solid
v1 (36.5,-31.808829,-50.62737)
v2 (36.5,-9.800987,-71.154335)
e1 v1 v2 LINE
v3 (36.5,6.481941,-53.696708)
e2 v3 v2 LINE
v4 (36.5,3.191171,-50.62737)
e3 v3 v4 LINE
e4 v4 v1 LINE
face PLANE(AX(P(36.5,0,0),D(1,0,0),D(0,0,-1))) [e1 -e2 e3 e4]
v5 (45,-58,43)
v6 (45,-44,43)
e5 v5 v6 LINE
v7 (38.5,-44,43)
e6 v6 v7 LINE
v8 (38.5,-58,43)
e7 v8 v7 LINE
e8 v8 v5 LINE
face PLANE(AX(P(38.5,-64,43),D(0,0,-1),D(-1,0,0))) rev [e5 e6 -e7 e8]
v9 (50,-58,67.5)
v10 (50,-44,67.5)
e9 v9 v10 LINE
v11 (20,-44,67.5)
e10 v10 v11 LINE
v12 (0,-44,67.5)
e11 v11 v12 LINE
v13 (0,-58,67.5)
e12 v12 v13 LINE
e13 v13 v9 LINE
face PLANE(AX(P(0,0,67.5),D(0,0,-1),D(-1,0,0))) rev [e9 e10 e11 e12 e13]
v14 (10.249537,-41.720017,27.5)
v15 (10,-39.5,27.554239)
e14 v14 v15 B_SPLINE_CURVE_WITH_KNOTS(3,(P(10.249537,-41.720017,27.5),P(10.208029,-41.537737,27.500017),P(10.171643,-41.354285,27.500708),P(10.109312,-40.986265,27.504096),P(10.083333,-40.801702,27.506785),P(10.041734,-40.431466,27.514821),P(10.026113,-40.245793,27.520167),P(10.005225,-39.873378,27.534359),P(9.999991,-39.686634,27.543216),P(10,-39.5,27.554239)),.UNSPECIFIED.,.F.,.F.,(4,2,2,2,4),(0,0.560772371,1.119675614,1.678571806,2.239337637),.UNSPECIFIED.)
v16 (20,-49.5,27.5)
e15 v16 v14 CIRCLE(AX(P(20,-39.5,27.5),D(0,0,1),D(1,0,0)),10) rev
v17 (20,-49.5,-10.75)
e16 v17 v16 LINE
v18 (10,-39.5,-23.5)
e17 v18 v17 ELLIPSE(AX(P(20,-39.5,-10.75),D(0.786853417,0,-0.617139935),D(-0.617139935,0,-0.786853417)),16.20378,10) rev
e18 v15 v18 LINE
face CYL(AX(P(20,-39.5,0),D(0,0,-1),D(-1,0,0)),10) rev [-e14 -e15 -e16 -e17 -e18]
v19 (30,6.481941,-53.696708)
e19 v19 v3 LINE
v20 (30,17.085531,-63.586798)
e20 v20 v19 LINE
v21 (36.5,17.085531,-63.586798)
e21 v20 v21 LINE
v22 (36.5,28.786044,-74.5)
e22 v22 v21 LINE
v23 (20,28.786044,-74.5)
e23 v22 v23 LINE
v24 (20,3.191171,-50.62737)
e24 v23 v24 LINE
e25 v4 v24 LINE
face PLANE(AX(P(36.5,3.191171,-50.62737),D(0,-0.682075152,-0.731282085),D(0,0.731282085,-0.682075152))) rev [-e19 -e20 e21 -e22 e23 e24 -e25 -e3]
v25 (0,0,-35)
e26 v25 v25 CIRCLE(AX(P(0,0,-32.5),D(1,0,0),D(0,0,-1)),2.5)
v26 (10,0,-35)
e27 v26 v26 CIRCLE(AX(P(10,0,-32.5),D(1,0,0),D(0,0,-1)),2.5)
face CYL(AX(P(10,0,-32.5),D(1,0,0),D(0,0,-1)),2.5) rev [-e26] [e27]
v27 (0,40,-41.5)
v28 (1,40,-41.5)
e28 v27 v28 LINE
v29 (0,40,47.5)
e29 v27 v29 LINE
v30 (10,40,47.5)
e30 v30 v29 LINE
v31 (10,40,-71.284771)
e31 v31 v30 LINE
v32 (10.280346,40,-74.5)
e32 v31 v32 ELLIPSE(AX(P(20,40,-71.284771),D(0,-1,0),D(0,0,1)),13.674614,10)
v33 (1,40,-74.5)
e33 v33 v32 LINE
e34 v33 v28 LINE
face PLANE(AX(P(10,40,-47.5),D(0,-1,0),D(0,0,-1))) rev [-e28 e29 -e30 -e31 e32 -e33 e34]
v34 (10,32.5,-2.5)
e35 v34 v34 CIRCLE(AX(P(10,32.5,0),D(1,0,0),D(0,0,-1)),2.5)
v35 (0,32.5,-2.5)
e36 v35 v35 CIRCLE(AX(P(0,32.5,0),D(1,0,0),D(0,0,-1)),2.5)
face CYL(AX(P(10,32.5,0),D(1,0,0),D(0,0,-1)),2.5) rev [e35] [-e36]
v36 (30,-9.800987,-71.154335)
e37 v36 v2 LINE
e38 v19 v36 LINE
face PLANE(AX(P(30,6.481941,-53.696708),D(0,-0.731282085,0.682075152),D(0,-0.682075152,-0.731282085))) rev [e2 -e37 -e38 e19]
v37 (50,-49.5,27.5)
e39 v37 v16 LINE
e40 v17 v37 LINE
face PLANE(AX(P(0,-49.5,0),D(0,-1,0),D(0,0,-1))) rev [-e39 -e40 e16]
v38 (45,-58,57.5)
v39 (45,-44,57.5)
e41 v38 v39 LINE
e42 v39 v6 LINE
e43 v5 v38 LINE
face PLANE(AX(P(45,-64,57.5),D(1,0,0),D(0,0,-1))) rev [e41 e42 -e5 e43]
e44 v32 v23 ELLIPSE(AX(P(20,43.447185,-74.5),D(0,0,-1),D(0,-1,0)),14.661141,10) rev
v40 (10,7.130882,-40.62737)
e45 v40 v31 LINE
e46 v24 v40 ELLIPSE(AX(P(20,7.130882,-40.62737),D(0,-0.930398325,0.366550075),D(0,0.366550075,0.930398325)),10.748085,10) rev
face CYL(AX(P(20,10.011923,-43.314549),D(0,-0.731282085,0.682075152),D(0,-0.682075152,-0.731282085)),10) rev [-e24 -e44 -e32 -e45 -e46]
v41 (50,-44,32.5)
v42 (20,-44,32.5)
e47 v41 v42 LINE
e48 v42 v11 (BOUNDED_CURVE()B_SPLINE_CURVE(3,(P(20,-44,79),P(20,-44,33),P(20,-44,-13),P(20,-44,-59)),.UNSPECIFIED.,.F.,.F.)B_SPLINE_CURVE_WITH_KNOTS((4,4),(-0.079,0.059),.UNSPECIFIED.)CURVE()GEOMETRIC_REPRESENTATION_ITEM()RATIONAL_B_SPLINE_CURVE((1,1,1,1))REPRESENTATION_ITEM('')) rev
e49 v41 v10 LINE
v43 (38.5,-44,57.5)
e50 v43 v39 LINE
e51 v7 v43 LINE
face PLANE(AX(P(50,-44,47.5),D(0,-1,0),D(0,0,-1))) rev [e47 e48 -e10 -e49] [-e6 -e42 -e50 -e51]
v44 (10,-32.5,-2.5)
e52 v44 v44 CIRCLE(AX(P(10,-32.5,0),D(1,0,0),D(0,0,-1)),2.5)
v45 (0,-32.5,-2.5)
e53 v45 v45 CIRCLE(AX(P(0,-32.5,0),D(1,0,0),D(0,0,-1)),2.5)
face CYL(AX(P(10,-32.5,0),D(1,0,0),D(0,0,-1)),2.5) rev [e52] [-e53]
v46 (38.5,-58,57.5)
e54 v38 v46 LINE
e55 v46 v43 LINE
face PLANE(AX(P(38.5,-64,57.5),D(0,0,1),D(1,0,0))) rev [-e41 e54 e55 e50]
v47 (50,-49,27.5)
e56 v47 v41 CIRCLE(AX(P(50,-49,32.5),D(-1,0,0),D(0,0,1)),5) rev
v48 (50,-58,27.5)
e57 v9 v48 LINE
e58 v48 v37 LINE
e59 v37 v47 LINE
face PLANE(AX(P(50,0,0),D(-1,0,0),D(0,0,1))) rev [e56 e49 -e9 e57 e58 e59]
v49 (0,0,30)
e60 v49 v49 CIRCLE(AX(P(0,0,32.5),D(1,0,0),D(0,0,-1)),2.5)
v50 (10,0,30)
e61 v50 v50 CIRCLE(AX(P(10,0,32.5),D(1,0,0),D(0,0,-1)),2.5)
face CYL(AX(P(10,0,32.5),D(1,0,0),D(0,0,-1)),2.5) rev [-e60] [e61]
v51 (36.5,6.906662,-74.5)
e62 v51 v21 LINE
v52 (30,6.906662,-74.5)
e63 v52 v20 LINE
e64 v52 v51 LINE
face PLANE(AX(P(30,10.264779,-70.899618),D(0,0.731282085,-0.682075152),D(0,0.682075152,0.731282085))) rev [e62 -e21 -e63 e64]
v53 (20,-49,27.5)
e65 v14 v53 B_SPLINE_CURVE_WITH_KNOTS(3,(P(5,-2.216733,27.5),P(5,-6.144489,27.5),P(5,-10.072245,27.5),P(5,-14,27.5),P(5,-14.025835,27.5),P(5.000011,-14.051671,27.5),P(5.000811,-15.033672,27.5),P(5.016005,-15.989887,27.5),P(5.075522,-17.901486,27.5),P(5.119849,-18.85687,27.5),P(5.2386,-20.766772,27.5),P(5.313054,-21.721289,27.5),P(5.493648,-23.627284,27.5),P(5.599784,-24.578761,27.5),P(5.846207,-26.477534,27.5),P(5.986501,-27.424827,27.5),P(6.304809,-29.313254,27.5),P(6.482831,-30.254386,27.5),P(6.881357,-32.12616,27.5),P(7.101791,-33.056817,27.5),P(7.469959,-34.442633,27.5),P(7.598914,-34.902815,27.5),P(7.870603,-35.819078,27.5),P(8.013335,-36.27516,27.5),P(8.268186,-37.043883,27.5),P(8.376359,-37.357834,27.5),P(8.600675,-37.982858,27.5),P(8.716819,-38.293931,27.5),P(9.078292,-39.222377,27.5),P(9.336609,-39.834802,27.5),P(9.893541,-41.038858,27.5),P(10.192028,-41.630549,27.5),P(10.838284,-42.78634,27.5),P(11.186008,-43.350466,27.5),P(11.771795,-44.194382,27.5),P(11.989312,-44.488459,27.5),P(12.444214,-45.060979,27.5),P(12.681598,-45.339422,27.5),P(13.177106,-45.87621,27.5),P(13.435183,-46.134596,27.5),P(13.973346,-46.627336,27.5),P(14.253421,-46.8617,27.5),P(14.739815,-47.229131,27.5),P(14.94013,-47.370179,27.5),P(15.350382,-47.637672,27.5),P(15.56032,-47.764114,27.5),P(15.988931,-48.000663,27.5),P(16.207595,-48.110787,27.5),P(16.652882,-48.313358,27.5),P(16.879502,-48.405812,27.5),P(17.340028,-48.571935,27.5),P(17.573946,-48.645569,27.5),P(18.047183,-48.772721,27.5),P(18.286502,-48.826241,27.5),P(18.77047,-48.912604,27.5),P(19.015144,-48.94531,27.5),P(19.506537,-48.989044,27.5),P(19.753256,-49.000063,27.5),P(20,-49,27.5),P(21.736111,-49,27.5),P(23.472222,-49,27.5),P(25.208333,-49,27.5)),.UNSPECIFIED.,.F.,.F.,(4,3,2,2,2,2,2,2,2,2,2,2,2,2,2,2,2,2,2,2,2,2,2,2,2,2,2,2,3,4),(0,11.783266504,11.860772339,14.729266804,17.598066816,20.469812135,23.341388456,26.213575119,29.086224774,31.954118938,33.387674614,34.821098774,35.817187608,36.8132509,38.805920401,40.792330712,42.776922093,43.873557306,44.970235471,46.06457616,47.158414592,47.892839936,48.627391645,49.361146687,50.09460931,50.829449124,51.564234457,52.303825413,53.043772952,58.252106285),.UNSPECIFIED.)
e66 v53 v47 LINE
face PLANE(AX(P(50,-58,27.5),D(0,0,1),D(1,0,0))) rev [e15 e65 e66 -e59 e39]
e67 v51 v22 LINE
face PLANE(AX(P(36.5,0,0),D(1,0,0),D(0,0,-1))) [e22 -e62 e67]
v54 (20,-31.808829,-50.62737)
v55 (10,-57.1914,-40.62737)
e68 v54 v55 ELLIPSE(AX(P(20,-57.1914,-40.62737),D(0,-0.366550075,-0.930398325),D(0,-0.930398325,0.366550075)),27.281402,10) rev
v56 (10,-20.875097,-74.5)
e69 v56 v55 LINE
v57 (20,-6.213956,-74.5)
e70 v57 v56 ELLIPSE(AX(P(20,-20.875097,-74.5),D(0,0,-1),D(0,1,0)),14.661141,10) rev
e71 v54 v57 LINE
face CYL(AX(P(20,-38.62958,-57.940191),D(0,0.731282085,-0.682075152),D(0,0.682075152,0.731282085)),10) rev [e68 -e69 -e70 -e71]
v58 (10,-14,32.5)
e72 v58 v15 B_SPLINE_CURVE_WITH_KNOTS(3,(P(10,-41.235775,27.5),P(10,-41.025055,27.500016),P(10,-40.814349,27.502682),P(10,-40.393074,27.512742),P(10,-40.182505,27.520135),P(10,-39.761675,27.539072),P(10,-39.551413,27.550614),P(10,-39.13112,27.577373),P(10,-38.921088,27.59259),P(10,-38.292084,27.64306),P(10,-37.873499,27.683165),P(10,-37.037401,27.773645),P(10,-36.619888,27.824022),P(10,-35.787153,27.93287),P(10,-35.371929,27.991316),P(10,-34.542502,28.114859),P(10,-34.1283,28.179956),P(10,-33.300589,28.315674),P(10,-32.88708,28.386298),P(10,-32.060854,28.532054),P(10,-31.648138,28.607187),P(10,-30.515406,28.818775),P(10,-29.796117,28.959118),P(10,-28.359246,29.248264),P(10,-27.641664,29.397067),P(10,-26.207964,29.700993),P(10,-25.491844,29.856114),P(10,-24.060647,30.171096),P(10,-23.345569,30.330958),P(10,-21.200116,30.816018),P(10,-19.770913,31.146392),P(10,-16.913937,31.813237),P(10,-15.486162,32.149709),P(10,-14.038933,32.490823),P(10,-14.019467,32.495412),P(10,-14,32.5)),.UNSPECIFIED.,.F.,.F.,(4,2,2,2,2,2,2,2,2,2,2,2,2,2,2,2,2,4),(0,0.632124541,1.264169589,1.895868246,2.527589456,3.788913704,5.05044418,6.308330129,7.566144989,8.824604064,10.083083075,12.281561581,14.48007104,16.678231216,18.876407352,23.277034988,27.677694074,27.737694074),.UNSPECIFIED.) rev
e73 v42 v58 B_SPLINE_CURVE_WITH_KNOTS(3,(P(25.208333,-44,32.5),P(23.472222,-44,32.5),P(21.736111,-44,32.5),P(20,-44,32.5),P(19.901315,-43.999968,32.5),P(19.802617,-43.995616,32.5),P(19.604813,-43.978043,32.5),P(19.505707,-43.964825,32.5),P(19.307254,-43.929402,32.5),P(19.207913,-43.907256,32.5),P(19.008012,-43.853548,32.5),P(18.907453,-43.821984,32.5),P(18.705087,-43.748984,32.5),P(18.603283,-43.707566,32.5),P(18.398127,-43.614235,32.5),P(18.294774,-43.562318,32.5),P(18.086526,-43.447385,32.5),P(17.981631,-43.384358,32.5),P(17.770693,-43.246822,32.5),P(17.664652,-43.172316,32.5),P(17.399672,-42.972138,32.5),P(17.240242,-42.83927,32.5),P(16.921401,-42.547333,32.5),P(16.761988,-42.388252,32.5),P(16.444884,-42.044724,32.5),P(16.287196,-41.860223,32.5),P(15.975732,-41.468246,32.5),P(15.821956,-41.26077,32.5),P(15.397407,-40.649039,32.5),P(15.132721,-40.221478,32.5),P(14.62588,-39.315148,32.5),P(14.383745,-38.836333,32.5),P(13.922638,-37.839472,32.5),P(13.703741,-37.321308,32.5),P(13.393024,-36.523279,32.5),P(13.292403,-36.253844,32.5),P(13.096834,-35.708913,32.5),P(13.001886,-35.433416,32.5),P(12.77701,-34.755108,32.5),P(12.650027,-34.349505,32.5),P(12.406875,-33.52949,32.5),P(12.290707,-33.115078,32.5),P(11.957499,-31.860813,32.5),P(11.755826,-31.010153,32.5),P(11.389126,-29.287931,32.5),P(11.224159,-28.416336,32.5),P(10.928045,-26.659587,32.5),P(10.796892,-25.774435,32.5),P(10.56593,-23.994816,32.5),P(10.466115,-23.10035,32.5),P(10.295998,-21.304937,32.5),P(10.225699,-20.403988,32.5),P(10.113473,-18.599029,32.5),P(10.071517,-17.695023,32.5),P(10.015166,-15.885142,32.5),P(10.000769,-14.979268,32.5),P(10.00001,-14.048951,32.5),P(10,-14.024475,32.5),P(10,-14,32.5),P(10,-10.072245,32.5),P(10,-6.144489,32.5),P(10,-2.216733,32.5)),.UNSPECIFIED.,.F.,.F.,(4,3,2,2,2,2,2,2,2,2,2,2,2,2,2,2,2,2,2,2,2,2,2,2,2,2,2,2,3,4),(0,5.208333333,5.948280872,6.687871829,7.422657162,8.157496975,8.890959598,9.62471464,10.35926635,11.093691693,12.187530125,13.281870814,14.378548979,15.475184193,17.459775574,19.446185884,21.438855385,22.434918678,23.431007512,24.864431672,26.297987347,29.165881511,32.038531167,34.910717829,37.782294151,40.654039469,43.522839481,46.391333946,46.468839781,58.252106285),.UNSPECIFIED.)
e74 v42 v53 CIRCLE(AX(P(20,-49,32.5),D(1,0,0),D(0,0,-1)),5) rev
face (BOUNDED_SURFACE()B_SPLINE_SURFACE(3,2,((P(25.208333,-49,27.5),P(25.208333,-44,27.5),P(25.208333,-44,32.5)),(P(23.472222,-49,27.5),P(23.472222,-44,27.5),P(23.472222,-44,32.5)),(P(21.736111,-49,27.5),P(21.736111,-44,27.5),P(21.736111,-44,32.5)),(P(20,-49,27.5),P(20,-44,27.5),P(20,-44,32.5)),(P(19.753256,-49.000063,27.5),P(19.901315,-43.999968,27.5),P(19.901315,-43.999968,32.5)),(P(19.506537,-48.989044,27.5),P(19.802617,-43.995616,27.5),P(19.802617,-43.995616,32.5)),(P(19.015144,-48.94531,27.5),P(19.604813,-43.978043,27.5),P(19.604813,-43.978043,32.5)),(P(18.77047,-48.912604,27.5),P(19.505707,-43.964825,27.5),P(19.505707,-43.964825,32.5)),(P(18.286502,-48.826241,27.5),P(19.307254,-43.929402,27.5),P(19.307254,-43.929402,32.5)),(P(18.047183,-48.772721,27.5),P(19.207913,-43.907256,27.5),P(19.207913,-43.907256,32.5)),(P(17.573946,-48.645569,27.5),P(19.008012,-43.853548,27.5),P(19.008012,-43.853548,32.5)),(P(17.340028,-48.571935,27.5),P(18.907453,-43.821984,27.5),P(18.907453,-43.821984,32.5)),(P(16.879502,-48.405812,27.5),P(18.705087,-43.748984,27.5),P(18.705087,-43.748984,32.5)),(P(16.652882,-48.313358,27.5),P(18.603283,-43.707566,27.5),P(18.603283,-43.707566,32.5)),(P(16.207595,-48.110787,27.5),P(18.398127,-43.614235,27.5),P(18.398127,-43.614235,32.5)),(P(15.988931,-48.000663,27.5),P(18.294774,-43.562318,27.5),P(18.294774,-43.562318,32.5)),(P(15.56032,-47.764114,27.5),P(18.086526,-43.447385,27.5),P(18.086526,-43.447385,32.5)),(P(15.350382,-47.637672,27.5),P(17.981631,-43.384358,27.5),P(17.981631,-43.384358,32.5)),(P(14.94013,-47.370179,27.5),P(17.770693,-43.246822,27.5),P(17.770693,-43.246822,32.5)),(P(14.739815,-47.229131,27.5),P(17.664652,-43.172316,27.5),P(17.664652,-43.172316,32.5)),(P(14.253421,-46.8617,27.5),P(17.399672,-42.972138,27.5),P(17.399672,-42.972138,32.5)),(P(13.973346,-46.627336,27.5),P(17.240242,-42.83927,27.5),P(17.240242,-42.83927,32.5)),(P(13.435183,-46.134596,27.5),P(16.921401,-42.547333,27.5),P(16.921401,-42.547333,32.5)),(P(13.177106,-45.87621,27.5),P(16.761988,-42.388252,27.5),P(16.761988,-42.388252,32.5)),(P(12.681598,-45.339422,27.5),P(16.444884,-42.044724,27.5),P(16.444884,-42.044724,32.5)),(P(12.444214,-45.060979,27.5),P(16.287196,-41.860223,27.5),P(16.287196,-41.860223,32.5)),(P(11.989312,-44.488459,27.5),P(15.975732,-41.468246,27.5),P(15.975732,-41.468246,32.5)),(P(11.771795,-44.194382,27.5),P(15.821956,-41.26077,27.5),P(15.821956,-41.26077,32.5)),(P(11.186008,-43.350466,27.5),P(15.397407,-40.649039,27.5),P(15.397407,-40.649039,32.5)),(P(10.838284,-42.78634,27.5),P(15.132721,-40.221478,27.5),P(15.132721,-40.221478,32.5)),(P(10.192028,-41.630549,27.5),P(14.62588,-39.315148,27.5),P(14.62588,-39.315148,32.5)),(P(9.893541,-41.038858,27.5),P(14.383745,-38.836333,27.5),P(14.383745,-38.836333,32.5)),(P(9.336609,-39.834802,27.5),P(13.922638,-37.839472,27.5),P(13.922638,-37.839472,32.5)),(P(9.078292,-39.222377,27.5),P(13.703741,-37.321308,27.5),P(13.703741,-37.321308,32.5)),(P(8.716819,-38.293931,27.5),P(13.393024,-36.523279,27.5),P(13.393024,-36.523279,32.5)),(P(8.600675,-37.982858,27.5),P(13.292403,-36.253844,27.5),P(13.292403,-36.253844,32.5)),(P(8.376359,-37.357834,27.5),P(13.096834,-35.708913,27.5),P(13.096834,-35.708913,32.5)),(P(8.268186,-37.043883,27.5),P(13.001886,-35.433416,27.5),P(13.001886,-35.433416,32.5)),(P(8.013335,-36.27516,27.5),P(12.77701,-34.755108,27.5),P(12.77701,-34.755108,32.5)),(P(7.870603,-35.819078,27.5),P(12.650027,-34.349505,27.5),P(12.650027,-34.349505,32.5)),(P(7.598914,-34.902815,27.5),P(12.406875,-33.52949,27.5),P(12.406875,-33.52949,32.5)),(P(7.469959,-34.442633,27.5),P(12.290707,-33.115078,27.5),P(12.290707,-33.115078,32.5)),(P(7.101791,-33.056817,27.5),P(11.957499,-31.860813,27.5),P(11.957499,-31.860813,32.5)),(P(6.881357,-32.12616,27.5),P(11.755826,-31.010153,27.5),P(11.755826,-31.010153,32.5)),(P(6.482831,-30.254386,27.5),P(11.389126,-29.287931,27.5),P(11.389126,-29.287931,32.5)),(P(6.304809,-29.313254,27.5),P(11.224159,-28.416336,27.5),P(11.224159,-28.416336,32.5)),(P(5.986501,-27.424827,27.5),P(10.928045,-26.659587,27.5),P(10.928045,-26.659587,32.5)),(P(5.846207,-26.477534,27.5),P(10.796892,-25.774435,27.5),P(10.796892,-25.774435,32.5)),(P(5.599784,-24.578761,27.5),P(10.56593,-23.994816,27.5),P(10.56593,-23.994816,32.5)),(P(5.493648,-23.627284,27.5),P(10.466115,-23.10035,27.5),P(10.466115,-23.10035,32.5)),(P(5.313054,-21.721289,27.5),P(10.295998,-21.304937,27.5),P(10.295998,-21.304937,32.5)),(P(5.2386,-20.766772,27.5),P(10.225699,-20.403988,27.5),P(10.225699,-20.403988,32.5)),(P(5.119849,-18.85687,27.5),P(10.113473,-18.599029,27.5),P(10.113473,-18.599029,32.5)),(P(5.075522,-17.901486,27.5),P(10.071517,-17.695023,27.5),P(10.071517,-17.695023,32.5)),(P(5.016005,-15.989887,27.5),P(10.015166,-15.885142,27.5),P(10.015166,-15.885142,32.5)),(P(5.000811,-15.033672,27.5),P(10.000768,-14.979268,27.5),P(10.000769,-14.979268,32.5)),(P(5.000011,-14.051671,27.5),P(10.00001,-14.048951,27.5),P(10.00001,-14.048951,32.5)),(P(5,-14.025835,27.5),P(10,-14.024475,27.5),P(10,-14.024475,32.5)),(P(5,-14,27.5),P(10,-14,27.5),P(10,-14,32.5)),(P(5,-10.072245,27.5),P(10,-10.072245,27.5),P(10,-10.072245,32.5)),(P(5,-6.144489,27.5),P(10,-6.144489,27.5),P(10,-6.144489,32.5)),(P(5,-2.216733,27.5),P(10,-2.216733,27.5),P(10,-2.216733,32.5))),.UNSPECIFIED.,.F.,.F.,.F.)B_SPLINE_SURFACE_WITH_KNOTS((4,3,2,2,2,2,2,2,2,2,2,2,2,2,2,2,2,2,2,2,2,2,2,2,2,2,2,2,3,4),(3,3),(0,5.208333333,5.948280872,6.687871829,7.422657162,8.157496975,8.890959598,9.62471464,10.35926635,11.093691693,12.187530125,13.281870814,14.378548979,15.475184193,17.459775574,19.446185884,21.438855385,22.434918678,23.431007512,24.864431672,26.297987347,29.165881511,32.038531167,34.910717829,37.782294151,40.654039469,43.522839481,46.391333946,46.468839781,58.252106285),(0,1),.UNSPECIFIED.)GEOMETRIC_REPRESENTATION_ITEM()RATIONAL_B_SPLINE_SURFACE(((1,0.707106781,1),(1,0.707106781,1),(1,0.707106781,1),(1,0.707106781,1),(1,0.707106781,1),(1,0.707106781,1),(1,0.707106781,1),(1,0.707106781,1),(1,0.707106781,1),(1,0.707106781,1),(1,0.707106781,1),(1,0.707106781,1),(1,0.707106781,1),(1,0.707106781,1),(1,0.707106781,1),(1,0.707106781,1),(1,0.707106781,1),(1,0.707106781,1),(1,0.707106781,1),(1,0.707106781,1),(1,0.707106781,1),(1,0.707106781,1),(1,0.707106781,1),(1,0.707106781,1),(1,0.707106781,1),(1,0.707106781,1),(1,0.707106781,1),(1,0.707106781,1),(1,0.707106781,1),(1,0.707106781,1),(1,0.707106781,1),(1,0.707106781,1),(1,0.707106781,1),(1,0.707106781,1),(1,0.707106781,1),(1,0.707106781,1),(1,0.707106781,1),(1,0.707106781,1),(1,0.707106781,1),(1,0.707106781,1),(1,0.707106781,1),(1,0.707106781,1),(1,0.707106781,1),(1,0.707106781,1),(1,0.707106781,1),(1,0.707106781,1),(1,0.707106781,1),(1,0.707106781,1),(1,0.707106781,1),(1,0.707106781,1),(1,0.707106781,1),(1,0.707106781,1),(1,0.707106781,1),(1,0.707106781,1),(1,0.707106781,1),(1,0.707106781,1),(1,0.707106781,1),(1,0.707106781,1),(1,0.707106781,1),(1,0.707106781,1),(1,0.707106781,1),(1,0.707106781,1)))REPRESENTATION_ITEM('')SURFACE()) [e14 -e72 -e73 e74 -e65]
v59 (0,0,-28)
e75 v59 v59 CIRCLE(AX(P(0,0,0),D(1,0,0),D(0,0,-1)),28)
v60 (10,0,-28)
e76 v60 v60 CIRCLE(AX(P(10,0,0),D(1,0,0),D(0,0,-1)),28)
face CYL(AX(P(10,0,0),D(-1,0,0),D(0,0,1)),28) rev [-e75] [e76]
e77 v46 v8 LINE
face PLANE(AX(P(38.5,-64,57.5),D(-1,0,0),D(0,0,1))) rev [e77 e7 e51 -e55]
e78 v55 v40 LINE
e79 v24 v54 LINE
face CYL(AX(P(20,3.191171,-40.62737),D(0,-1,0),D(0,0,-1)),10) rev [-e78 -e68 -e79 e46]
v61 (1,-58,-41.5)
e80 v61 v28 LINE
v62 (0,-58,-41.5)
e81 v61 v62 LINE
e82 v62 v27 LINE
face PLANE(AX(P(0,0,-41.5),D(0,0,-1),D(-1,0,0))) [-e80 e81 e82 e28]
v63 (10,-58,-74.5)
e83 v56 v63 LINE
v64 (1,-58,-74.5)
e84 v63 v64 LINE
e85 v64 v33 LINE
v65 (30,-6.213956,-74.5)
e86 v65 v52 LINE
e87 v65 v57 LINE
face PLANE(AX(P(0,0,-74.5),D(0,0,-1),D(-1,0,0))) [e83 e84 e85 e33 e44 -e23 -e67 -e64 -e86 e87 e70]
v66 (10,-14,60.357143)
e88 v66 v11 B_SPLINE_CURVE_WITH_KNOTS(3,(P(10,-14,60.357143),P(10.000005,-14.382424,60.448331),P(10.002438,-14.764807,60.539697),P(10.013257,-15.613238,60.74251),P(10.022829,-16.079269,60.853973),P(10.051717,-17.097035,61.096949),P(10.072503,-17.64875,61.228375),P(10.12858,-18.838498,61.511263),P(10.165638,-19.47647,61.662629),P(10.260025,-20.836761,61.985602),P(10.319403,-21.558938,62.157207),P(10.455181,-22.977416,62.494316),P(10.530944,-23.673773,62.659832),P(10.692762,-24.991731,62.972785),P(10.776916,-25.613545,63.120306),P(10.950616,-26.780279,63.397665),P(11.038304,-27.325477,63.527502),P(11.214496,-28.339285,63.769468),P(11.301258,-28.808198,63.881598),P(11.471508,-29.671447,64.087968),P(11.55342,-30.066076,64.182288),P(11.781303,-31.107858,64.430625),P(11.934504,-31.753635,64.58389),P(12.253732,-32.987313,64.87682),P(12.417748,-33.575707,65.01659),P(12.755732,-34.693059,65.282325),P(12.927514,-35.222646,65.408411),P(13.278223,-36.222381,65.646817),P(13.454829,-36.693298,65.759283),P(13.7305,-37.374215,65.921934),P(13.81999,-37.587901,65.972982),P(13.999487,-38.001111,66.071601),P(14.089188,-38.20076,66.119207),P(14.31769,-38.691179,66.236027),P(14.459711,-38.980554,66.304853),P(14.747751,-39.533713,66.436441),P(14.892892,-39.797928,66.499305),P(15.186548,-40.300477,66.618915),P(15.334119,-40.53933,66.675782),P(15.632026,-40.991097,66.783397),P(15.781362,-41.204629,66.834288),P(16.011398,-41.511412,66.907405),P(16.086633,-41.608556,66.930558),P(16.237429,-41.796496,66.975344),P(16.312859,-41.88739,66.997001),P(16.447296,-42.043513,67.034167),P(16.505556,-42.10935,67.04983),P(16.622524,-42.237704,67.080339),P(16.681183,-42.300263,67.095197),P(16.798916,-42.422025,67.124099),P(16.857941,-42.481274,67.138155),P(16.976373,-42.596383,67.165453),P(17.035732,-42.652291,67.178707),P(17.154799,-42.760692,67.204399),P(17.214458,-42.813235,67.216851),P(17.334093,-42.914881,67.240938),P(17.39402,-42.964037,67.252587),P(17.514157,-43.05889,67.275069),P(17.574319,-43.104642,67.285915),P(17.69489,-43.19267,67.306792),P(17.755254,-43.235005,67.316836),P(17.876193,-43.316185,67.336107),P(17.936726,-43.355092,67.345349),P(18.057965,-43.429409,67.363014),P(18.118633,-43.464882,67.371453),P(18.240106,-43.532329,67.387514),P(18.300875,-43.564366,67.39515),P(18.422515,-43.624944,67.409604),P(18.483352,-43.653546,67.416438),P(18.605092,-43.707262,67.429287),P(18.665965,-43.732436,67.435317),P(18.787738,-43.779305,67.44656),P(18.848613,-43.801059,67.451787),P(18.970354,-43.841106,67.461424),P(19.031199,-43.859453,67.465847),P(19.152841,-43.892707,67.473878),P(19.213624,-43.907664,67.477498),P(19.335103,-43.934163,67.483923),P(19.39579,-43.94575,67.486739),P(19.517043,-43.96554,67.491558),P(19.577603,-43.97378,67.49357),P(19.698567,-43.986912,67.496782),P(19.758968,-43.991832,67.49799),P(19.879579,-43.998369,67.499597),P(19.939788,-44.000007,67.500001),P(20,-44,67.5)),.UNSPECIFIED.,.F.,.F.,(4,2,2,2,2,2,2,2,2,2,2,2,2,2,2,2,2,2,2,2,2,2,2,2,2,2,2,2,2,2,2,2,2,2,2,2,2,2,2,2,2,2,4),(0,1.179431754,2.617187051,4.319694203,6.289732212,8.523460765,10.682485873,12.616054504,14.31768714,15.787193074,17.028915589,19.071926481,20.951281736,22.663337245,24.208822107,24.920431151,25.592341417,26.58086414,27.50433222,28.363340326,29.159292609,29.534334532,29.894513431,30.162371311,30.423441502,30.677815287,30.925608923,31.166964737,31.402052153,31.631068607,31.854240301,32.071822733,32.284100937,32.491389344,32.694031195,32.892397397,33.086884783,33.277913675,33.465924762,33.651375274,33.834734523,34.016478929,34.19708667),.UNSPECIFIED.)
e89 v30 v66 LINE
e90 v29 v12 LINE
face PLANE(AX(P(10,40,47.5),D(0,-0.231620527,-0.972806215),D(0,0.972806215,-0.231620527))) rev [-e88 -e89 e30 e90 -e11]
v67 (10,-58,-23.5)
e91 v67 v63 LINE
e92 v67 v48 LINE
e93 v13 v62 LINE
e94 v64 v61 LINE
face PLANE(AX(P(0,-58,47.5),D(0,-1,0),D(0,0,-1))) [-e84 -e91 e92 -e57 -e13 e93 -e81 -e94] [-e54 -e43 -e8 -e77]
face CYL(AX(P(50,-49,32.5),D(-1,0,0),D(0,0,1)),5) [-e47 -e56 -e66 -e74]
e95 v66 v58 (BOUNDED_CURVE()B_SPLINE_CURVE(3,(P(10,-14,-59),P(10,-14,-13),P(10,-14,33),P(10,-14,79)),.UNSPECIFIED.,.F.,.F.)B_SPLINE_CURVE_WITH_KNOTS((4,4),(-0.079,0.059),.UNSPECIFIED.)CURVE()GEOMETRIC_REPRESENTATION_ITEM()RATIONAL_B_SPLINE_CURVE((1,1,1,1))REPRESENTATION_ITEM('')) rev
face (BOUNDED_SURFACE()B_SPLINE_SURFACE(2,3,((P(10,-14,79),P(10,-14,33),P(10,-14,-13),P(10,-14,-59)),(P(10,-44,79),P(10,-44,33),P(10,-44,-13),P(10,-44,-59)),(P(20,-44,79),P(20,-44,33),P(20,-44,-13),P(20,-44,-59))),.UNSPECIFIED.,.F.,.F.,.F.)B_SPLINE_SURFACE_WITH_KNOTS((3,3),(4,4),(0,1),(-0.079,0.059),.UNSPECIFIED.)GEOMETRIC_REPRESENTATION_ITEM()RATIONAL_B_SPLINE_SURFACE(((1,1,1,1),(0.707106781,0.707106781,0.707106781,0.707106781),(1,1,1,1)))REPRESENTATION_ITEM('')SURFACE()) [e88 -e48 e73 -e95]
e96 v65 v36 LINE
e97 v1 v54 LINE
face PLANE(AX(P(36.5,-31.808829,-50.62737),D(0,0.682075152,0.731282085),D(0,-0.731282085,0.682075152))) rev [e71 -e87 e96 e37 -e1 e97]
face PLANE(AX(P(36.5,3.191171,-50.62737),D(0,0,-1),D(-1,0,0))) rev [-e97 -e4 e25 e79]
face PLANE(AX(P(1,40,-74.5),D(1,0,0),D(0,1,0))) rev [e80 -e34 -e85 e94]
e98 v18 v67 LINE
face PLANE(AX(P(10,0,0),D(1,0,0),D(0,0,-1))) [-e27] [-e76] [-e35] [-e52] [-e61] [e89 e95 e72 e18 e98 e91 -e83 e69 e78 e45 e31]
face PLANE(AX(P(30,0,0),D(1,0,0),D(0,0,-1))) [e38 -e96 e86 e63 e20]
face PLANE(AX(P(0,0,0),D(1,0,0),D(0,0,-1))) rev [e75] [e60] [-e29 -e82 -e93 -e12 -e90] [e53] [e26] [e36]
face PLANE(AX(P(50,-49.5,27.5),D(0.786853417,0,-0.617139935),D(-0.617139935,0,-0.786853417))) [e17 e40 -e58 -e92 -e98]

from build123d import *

# Parameters (mm, degrees)
SKETCH1_W                = 95
SKETCH1_H                = 80
SKETCH1_R                = 28
BOSS_EXTRUDE1_DEPTH      = 10
F_5_0_5_DIAMETER_HOLE1_D = 5
SKETCH4_W                = 95
SKETCH4_H                = 18
BOSS_EXTRUDE2_DEPTH      = 10
SKETCH6_W                = 20
SKETCH6_H                = 14
BOSS_EXTRUDE3_DEPTH      = 40
SKETCH10_W               = 50
SKETCH10_H               = 14
BOSS_EXTRUDE4_DEPTH      = 20
SKETCH9_W                = 6.5
SKETCH9_H                = 14.5
CUT_EXTRUDE1_DEPTH       = 20
BOSS_EXTRUDE5_DEPTH      = 5
FILLET3_SIZE             = 10
FILLET3_SIZE_2           = 30
SKETCH15_W               = 10
SKETCH15_H               = 98
CUT_EXTRUDE2_DEPTH       = 6
SKETCH16_W               = 9
SKETCH16_H               = 98
BOSS_EXTRUDE7_DEPTH      = 33
BOSS_EXTRUDE8_DEPTH      = 26.5
CUT_EXTRUDE3_DEPTH       = 6.5
FILLET4_R                = 10
BOSS_EXTRUDE9_DEPTH      = 8.5
FILLET5_R                = 5
FILLET6_R                = 10
CUT_EXTRUDE4_DEPTH       = 133.445770086
CUT_EXTRUDE4_DEPTH_BACK  = 133.445770086
SKETCH20_W               = 6.5
SKETCH20_H               = 14.5


with BuildPart() as part:
    # Sketch1 → Boss-Extrude1 (new body)
    with BuildSketch(Plane(origin=(0, 0, 0), x_dir=(0, 0, -1), z_dir=(1, 0, 0))):
        Rectangle(SKETCH1_W, SKETCH1_H)
        Circle(SKETCH1_R, mode=Mode.SUBTRACT)
    extrude(amount=BOSS_EXTRUDE1_DEPTH)

    # Ø5.0 (5) Diameter Hole1 (through all)
    with Locations(Plane(origin=(10, 0, 0), x_dir=(0, 0, -1), z_dir=(1, 0, 0))):
        with Locations((-32.5, 0), (0, 32.5), (32.5, 0), (0, -32.5)):
            Hole(F_5_0_5_DIAMETER_HOLE1_D / 2)

    # Sketch4 → Boss-Extrude2 (add)
    with BuildSketch(Plane(origin=(10, 0, 0), x_dir=(0, 0, -1), z_dir=(1, 0, 0))):
        with Locations((0, -49)):
            Rectangle(SKETCH4_W, SKETCH4_H)
    extrude(amount=-BOSS_EXTRUDE2_DEPTH)

    # Sketch6 → Boss-Extrude3 (add)
    with BuildSketch(Plane(origin=(10, 0, 0), x_dir=(0, 0, -1), z_dir=(1, 0, 0))):
        with Locations((-37.5, -51)):
            Rectangle(SKETCH6_W, SKETCH6_H)
    extrude(amount=BOSS_EXTRUDE3_DEPTH)

    # Sketch10 → Boss-Extrude4 (add)
    with BuildSketch(Plane.XY.offset(47.5)):
        with Locations((25, -51)):
            Rectangle(SKETCH10_W, SKETCH10_H)
    extrude(amount=BOSS_EXTRUDE4_DEPTH)

    # Sketch9 → Cut-Extrude1 (cut)
    with BuildSketch(Plane(origin=(0, -44, 0), x_dir=(1, 0, 0), z_dir=(0, 1, 0))):
        with Locations((41.75, -50.25)):
            Rectangle(SKETCH9_W, SKETCH9_H)
    extrude(amount=-CUT_EXTRUDE1_DEPTH, mode=Mode.SUBTRACT)

    # Sketch13 → Boss-Extrude5 (add, symmetric)
    with BuildSketch(Plane(origin=(5, 0, 0), x_dir=(0, 0, -1), z_dir=(1, 0, 0))):
        Polygon((-47.5, 40), (-67.5, -44), (-47.5, -44), align=None)
    extrude(amount=BOSS_EXTRUDE5_DEPTH, both=True)

    # Fillet3
    # an asymmetric fillet: 30, 10 mm, written as the material it adds along each edge
    with BuildSketch(Plane(origin=(10, -44, 67.5), x_dir=(1, 0, 0), z_dir=(0, 0, -1))) as fillet3_piece_1_section:
        with BuildLine():
            Bezier((FILLET3_SIZE, 0), (0, 0), (0, -FILLET3_SIZE_2), weights=[1, 0.707106781, 1])
            Line((0, -FILLET3_SIZE_2), (0, 0))
            Line((0, 0), (FILLET3_SIZE, 0))
        make_face()
    fillet3_piece_1 = extrude(amount=40, mode=Mode.PRIVATE)
    fillet3_piece_1 = split(fillet3_piece_1, bisect_by=Plane(origin=(11.956136852, -32.150515723, 64.67869422), z_dir=(0, -0.23162052730603974, -0.9728062146853669)), keep=Keep.TOP, mode=Mode.PRIVATE)
    add(fillet3_piece_1)

    # Sketch15 → Cut-Extrude2 (cut)
    with BuildSketch(Plane(origin=(0, 0, -47.5), x_dir=(-1, 0, 0), z_dir=(0, 0, -1))):
        with Locations((-5, -9)):
            Rectangle(SKETCH15_W, SKETCH15_H)
    extrude(amount=-CUT_EXTRUDE2_DEPTH, mode=Mode.SUBTRACT)

    # Sketch16 → Boss-Extrude7 (add)
    with BuildSketch(Plane(origin=(0, 0, -41.5), x_dir=(-1, 0, 0), z_dir=(0, 0, -1))):
        with Locations((-5.5, -9)):
            Rectangle(SKETCH16_W, SKETCH16_H)
    extrude(amount=BOSS_EXTRUDE7_DEPTH)

    # Sketch17 → Boss-Extrude8 (add)
    with BuildSketch(Plane(origin=(10, 0, 0), x_dir=(0, 0, -1), z_dir=(1, 0, 0))):
        Polygon((50.627369684, 3.19117124), (74.5, 28.786044199), (74.5, -6.213955801), (50.627369684, -31.80882876), align=None)
    extrude(amount=BOSS_EXTRUDE8_DEPTH)

    # Sketch18 → Cut-Extrude3 (cut)
    with BuildSketch(Plane(origin=(36.5, 0, 0), x_dir=(0, 0, -1), z_dir=(1, 0, 0))):
        Polygon((53.696707867, 6.481940621), (61.009528713, -0.338810898), (70.899618415, 10.264779328), (63.58679757, 17.085530846), align=None)
    extrude(amount=-CUT_EXTRUDE3_DEPTH, mode=Mode.SUBTRACT)

    # Fillet4
    fillet4_edges = [part.edges().sort_by_distance(p)[0] for p in [
        (10, 15.98860772, -62.563684842),
        (10, -14.30882876, -50.627369684),
        (10, -19.01139228, -62.563684842),
    ]]
    fillet(fillet4_edges, radius=FILLET4_R)

    # Sketch19 → Boss-Extrude9 (add)
    with BuildSketch(Plane.XZ.offset(58)):
        Polygon((50, 27.5), (10, -23.5), (10, 27.5), align=None)
    extrude(amount=-BOSS_EXTRUDE9_DEPTH)

    # Fillet5
    fillet5_edges = [part.edges().sort_by_distance(p)[0] for p in [
        (35, -44, 27.5),
    ]]
    fillet(fillet5_edges, radius=FILLET5_R)

    # Fillet6
    fillet6_edges = [part.edges().sort_by_distance(p)[0] for p in [
        (10, -49.5, 2),
    ]]
    fillet(fillet6_edges, radius=FILLET6_R)

    # Sketch20 → Cut-Extrude4 (cut, two sides: drawn at the far end of the back side and taken through both)
    with BuildSketch(Plane(origin=(0, -30.588526305, -32.795273685), x_dir=(1, 0, 0), z_dir=(0, 0.6820751518904317, 0.731282084543061)).offset(-CUT_EXTRUDE4_DEPTH_BACK)):
        with Locations((33.25, 48.615317224)):
            Rectangle(SKETCH20_W, SKETCH20_H)
    extrude(amount=CUT_EXTRUDE4_DEPTH + CUT_EXTRUDE4_DEPTH_BACK, mode=Mode.SUBTRACT)


solid = part.part
